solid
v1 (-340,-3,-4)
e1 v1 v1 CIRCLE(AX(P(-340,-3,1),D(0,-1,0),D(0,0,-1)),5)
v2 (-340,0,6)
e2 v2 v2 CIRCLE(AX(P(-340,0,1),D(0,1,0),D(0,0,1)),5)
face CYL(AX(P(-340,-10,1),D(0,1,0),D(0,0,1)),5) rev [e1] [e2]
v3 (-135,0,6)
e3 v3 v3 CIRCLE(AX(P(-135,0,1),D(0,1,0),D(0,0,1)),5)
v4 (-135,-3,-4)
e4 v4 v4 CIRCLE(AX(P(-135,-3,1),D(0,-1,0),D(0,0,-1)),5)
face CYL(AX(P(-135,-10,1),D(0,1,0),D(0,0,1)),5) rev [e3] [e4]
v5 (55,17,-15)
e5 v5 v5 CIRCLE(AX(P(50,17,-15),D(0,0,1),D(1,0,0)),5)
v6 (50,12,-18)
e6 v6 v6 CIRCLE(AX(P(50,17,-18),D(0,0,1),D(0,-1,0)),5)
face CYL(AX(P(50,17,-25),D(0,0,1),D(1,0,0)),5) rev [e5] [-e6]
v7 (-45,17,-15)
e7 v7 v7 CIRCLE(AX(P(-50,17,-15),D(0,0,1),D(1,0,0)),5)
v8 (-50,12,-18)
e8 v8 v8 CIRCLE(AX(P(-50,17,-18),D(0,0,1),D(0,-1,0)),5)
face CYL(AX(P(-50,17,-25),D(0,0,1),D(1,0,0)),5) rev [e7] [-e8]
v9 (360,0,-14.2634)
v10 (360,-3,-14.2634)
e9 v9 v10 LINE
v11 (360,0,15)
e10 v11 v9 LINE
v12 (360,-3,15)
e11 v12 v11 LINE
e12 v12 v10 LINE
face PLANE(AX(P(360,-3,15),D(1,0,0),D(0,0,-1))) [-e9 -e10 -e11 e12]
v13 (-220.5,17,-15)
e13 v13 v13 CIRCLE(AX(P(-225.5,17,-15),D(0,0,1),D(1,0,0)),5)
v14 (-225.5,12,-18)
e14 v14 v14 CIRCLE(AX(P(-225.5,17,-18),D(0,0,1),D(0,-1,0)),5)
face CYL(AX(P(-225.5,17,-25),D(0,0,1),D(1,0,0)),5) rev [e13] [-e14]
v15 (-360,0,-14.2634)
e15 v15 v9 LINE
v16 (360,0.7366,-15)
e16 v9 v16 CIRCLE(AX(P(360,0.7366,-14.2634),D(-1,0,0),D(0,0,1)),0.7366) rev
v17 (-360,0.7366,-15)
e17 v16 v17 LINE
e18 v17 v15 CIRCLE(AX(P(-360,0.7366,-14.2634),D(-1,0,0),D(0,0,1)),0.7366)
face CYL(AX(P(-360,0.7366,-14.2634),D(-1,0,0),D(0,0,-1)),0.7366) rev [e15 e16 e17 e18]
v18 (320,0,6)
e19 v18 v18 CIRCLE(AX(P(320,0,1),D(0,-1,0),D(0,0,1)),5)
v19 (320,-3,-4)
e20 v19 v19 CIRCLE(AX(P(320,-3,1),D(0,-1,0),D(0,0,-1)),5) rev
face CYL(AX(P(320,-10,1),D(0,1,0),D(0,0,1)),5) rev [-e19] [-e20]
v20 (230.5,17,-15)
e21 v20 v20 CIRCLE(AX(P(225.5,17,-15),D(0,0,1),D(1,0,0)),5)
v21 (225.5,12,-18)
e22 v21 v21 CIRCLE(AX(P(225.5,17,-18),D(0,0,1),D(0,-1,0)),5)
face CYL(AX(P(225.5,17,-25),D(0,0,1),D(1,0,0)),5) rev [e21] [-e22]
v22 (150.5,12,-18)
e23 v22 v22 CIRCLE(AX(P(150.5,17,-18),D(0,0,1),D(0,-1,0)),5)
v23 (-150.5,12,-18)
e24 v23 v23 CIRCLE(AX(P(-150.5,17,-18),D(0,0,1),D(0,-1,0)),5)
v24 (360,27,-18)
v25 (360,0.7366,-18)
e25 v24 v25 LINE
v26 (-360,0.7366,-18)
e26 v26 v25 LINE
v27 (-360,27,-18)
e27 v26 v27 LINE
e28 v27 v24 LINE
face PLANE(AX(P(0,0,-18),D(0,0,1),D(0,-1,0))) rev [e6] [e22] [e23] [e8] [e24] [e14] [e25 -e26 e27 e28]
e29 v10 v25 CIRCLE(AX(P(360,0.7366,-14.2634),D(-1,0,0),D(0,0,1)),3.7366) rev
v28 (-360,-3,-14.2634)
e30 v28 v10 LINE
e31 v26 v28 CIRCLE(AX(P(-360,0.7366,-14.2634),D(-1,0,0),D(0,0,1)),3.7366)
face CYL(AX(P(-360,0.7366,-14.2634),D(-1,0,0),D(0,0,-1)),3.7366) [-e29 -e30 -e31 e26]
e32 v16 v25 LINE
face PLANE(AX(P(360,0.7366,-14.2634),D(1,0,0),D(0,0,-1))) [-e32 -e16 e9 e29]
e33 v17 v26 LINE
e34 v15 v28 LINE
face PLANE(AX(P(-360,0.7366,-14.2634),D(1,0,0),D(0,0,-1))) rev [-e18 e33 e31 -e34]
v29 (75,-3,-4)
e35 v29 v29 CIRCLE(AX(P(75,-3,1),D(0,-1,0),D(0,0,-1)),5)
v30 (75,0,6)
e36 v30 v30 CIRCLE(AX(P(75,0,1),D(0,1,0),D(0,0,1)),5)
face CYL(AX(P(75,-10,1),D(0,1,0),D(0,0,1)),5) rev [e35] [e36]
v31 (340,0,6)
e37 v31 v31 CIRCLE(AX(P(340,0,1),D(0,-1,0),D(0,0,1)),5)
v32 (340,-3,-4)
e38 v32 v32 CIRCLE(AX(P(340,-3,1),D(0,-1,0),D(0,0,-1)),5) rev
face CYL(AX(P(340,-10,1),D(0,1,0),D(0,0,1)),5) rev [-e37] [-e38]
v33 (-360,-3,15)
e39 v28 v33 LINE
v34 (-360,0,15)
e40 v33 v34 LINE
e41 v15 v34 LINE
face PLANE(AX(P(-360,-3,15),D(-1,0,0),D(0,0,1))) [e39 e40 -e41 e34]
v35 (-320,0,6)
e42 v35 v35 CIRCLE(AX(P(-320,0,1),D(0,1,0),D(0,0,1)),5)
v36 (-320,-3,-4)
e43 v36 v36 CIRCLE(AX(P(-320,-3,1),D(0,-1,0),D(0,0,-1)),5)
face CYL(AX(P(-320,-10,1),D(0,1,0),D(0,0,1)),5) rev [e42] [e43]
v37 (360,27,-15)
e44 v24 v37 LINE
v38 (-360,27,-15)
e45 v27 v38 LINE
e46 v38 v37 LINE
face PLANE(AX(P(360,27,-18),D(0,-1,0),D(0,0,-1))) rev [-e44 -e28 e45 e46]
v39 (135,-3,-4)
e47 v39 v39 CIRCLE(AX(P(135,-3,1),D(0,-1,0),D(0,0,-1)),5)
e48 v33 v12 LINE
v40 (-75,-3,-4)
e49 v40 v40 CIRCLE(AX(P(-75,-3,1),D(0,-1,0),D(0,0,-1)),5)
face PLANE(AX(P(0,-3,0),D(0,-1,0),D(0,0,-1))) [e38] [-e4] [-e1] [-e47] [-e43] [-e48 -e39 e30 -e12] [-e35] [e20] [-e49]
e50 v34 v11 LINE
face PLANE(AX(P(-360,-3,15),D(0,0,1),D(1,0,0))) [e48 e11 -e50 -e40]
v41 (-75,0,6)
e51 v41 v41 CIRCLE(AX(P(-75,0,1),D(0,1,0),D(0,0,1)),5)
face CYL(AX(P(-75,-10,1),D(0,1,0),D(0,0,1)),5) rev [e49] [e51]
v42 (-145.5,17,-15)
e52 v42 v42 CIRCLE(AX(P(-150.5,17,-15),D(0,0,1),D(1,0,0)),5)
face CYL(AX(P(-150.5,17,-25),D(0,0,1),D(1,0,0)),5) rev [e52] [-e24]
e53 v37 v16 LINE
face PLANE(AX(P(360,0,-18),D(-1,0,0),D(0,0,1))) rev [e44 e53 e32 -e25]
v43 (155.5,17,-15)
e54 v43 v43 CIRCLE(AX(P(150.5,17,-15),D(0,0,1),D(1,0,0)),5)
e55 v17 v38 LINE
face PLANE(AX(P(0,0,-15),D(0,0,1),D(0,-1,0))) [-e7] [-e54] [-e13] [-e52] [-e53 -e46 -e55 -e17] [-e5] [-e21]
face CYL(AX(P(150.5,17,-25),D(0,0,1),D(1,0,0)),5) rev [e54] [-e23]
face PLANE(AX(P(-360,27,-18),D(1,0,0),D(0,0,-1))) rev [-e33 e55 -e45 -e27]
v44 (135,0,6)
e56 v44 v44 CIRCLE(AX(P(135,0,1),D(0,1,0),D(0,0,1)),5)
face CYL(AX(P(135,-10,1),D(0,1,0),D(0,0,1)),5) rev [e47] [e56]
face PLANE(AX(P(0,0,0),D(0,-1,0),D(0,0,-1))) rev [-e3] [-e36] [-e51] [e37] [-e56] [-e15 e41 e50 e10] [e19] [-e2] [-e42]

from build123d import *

# Parameters (mm, degrees)
SKETCH3_W                    = 720
SKETCH3_H                    = 30
BASE_FLANGE1_DEPTH           = 3
EDGE_FLANGE1_STRIP_W         = 13.4732
EDGE_FLANGE1_STRIP_H         = 3
EDGE_FLANGE1_STRIP_CUT_DEPTH = 720
EDGE_FLANGE1_DEPTH           = 720
SKETCH10_R                   = 5
CUT_EXTRUDE2_DEPTH           = 10
SKETCH11_R                   = 5
CUT_EXTRUDE3_DEPTH           = 10
SKETCH12_R                   = 5
CUT_EXTRUDE4_DEPTH           = 10


# Sheet-metal steps are written as plain solids
with BuildPart() as part:
    # Sketch3 → Base-Flange1 (new body)
    with BuildSketch(Plane(origin=(0, 0, 0), x_dir=(1, 0, 0), z_dir=(0, 1, 0))):
        Rectangle(SKETCH3_W, SKETCH3_H)
    extrude(amount=-BASE_FLANGE1_DEPTH)

    # Edge-Flange1 strip (across the edge) → Edge-Flange1 strip cut (cut)
    with BuildSketch(Plane(origin=(360, 0, -15), x_dir=(0, 0, 1), z_dir=(-1, 0, 0))):
        with Locations((-6, -1.5)):
            Rectangle(EDGE_FLANGE1_STRIP_W, EDGE_FLANGE1_STRIP_H)
    extrude(amount=EDGE_FLANGE1_STRIP_CUT_DEPTH, mode=Mode.SUBTRACT)

    # Edge-Flange1 section (across the edge) → Edge-Flange1 (add)
    with BuildSketch(Plane(origin=(360, 0, -15), x_dir=(0, 0, 1), z_dir=(-1, 0, 0))):
        with BuildLine():
            Line((-3, 0.7366), (-3, 27))
            Line((-3, 27), (0, 27))
            Line((0, 27), (0, 0.7366))
            ThreePointArc((0, 0.7366), (0.215745145, 0.215745145), (0.7366, 0))
            Line((0.7366, 0), (0.7366, -3))
            ThreePointArc((0.7366, -3), (-1.905575199, -1.905575199), (-3, 0.7366))
        make_face()
    extrude(amount=EDGE_FLANGE1_DEPTH)

    # Sketch10 → Cut-Extrude2 (cut)
    with BuildSketch(Plane(origin=(0, 0, 0), x_dir=(1, 0, 0), z_dir=(0, 1, 0))):
        with Locations(Location((-340, -1, 0), (0, 0, 270))):
            Circle(SKETCH10_R)
        with Locations(Location((-320, -1, 0), (0, 0, 270))):
            Circle(SKETCH10_R)
    cut_extrude2 = extrude(amount=-CUT_EXTRUDE2_DEPTH, mode=Mode.SUBTRACT)

    # Mirror1: Cut-Extrude2 across plane
    add(cut_extrude2.mirror(Plane(origin=(0, 0, 0), x_dir=(0, 0, 1), z_dir=(1, 0, 0))), mode=Mode.SUBTRACT)

    # Sketch11 → Cut-Extrude3 (cut)
    with BuildSketch(Plane.XY.offset(-15)):
        with Locations((225.5, 17)):
            Circle(SKETCH11_R)
        with Locations((-225.5, 17)):
            Circle(SKETCH11_R)
        with Locations((-150.5, 17)):
            Circle(SKETCH11_R)
        with Locations((150.5, 17)):
            Circle(SKETCH11_R)
        with Locations((50, 17)):
            Circle(SKETCH11_R)
        with Locations((-50, 17)):
            Circle(SKETCH11_R)
    extrude(amount=-CUT_EXTRUDE3_DEPTH, mode=Mode.SUBTRACT)

    # Sketch12 → Cut-Extrude4 (cut)
    with BuildSketch(Plane(origin=(0, 0, 0), x_dir=(1, 0, 0), z_dir=(0, 1, 0))):
        with Locations(Location((-75, -1, 0), (0, 0, 270))):
            Circle(SKETCH12_R)
        with Locations(Location((75, -1, 0), (0, 0, 270))):
            Circle(SKETCH12_R)
        with Locations(Location((135, -1, 0), (0, 0, 270))):
            Circle(SKETCH12_R)
        with Locations(Location((-135, -1, 0), (0, 0, 270))):
            Circle(SKETCH12_R)
    extrude(amount=-CUT_EXTRUDE4_DEPTH, mode=Mode.SUBTRACT)


solid = part.part
